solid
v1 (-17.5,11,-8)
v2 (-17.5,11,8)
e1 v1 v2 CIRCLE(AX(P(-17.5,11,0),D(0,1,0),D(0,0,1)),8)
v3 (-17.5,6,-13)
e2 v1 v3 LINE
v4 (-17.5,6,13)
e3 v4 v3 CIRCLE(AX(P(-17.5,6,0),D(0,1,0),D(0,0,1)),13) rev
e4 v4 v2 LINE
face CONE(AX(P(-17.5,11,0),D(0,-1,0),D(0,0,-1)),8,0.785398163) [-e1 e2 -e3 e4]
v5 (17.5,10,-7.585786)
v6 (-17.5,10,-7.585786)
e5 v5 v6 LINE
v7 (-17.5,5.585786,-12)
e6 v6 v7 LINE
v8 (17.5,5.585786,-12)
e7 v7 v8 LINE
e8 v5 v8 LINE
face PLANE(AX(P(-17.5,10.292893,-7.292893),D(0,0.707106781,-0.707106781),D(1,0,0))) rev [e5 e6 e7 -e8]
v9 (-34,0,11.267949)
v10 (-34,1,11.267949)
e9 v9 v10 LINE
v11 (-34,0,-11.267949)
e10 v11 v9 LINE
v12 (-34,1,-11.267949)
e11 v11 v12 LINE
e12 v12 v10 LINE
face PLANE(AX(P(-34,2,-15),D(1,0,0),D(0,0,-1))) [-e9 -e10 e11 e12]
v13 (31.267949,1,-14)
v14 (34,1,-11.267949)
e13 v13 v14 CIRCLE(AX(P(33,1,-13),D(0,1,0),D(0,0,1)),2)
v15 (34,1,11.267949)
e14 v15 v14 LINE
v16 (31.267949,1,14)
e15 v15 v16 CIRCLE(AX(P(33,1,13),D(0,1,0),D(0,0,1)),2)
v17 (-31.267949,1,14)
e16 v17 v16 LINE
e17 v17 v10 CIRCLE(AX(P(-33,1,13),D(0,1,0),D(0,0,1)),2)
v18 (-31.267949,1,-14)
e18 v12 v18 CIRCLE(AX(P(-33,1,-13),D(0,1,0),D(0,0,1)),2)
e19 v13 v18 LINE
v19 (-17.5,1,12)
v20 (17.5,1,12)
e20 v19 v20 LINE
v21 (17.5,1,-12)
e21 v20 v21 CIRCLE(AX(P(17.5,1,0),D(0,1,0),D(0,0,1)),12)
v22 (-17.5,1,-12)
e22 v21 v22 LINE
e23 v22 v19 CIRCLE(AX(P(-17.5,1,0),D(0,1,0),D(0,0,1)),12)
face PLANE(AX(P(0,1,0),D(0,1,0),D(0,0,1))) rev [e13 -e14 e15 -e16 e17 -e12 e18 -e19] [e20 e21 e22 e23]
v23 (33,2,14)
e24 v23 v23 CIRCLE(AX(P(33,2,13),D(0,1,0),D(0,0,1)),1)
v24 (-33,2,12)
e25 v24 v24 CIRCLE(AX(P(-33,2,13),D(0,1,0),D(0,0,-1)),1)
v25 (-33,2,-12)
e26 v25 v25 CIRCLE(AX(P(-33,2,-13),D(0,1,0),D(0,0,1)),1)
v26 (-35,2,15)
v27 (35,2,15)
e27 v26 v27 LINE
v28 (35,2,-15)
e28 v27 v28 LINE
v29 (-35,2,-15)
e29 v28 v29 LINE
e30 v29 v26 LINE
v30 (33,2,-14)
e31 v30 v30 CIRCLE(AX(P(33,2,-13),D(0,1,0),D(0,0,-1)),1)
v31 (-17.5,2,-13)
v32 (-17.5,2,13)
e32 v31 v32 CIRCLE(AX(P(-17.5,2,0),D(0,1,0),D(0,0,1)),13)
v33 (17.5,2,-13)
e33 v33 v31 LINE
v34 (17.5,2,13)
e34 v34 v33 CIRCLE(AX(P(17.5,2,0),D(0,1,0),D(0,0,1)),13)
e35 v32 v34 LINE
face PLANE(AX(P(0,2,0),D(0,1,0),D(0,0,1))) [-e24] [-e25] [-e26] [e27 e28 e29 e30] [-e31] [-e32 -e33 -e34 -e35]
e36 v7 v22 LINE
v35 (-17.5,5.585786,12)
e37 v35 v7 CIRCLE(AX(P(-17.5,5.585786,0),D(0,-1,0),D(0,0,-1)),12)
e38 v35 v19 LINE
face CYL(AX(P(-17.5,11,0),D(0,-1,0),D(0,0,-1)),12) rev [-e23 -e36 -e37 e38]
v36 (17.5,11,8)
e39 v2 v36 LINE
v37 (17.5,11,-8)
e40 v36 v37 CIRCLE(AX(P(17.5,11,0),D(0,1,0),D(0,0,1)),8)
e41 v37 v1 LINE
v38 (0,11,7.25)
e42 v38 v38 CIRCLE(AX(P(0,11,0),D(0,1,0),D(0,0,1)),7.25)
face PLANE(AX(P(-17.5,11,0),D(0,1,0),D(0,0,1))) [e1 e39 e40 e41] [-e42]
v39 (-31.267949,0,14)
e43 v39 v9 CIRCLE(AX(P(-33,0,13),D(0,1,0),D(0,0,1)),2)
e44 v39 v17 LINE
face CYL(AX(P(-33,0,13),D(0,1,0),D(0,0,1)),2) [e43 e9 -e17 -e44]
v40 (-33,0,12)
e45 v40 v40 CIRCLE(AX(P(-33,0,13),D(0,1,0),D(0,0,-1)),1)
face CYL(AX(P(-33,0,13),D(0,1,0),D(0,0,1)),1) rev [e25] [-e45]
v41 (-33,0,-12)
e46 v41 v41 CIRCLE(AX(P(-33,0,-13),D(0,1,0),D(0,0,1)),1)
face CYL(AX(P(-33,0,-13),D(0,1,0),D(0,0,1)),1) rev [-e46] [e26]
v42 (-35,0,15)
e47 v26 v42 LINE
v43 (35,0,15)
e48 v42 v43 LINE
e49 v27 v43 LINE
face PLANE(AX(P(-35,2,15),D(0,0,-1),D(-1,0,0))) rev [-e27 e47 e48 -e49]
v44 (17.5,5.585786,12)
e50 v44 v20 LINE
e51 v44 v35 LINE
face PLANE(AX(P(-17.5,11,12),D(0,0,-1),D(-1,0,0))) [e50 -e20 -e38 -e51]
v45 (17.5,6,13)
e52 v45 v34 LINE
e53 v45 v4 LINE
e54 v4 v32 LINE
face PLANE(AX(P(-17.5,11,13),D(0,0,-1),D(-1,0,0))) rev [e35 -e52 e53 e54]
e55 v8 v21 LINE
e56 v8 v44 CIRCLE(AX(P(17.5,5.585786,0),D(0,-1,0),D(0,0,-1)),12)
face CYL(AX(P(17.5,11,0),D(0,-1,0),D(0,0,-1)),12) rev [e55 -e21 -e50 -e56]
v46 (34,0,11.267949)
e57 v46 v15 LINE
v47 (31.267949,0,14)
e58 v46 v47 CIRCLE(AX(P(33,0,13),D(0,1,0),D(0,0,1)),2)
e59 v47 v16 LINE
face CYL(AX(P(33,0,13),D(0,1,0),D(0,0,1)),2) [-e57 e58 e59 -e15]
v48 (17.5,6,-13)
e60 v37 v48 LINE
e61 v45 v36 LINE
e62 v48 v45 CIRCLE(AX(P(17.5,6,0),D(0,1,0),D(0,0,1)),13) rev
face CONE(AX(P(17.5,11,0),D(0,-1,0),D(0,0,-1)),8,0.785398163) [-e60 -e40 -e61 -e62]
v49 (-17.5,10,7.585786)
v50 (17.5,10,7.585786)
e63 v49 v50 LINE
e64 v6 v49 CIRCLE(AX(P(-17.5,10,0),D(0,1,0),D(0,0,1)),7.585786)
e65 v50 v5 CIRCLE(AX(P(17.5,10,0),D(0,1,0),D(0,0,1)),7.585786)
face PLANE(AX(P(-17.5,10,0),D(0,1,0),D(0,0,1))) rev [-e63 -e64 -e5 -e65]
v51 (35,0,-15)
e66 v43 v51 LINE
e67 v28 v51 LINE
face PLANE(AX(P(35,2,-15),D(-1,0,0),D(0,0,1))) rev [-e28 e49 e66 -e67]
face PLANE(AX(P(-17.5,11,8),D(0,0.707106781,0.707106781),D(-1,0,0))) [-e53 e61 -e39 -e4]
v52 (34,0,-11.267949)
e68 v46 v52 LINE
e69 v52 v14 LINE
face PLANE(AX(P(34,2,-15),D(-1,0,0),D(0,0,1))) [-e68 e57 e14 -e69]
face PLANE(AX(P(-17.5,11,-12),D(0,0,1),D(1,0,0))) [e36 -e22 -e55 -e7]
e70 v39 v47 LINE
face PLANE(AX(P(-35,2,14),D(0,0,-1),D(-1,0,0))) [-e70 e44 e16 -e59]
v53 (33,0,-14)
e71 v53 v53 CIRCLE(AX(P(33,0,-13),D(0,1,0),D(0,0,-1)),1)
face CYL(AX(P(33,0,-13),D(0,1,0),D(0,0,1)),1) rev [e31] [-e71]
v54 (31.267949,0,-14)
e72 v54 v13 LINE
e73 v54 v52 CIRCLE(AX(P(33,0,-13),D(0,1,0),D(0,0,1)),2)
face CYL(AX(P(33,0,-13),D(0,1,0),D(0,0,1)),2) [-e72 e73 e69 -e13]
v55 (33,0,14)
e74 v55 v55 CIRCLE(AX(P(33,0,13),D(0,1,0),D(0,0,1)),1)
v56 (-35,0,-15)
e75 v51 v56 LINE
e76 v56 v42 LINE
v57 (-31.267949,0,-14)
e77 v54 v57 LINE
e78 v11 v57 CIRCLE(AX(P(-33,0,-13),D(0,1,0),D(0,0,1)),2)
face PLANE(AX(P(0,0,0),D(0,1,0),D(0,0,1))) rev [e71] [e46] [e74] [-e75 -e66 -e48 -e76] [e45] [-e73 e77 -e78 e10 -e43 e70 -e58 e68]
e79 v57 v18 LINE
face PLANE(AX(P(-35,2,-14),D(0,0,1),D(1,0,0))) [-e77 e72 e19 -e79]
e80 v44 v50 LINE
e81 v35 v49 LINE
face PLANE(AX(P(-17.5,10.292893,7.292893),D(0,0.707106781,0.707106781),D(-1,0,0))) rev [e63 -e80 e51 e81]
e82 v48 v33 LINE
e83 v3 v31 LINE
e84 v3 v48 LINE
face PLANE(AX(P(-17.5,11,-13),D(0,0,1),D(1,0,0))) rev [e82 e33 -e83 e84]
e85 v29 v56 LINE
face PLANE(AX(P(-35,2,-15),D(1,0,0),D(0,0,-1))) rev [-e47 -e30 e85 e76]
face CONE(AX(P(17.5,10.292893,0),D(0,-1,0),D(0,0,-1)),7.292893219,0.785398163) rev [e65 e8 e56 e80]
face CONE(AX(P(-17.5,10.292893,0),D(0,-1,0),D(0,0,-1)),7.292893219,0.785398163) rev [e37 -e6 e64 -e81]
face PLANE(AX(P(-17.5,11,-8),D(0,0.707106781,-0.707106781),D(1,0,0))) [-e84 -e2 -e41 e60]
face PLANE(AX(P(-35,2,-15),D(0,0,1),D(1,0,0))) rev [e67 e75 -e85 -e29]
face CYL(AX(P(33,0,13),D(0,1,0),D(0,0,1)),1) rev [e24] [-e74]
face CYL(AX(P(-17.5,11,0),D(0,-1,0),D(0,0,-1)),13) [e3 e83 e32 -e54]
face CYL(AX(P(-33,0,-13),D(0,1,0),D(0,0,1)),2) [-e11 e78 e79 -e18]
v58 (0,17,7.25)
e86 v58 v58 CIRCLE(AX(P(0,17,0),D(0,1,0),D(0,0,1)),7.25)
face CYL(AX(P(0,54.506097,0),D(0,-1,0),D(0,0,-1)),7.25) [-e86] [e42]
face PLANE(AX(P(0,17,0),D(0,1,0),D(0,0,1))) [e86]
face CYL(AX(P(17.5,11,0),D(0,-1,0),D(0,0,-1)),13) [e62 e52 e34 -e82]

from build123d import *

# Parameters (mm, degrees)
SKETCH_1_W          = 70
SKETCH_1_H          = 30
EXTRUDE_1_DEPTH     = 2
SKETCH_2_R          = 1
CUT_EXTRUDE_1_DEPTH = 39.13135193
EXTRUDE_2_DEPTH     = 9
CHAMFER_2_SIZE      = 5
SHELL_2_DEPTH       = 5.585786438
SHELL_2_2_DEPTH     = 1
SKETCH_4_R          = 7.25
EXTRUDE_3_DEPTH     = 6


with BuildPart() as part:
    # 草图1 → 凸台-拉伸1 (new body)
    with BuildSketch(Plane(origin=(0, 0, 0), x_dir=(1, 0, 0), z_dir=(0, 1, 0))):
        Rectangle(SKETCH_1_W, SKETCH_1_H)
    extrude(amount=EXTRUDE_1_DEPTH)

    # 草图2 → 切除-拉伸1 (cut, through all)
    with BuildSketch(Plane(origin=(0, 2, 0), x_dir=(1, 0, 0), z_dir=(0, 1, 0))):
        with Locations(Location((-33, 13, 0), (0, 0, 270))):
            Circle(SKETCH_2_R)
        with Locations(Location((33, 13, 0), (0, 0, 90))):
            Circle(SKETCH_2_R)
        with Locations(Location((33, -13, 0), (0, 0, 270))):
            Circle(SKETCH_2_R)
        with Locations(Location((-33, -13, 0), (0, 0, 90))):
            Circle(SKETCH_2_R)
    extrude(amount=-CUT_EXTRUDE_1_DEPTH, mode=Mode.SUBTRACT)

    # 草图3 → 凸台-拉伸2 (add)
    with BuildSketch(Plane(origin=(0, 2, 0), x_dir=(1, 0, 0), z_dir=(0, 1, 0))):
        with BuildLine():
            Line((-17.5, 13), (17.5, 13))
            ThreePointArc((17.5, 13), (30.5, 0), (17.5, -13))
            Line((17.5, -13), (-17.5, -13))
            ThreePointArc((-17.5, -13), (-30.5, 0), (-17.5, 13))
        make_face()
    extrude(amount=EXTRUDE_2_DEPTH)

    # 倒角2
    chamfer_2_edges = [part.edges().sort_by_distance(p)[0] for p in [
        (-30.5, 11, 0),
        (0, 11, 13),
        (30.5, 11, 0),
        (0, 11, -13),
    ]]
    chamfer(chamfer_2_edges, length=CHAMFER_2_SIZE)

    # 抽壳2: read off the stored shape, not the designer's step
    # 抽壳2 outline → 抽壳2 (cut)
    with BuildSketch(Plane(origin=(0, 0, 0), x_dir=(1, 0, 0), z_dir=(0, 1, 0))):
        with BuildLine():
            ThreePointArc((-17.5, 12), (-29.5, 0), (-17.5, -12))
            Line((-17.5, -12), (17.5, -12))
            ThreePointArc((17.5, -12), (29.5, 0), (17.5, 12))
            Line((17.5, 12), (-17.5, 12))
        make_face()
    extrude(amount=SHELL_2_DEPTH, mode=Mode.SUBTRACT)

    # Shell 2 2 outline → Shell 2 2 (cut)
    with BuildSketch(Plane(origin=(0, 0, 0), x_dir=(1, 0, 0), z_dir=(0, 1, 0))):
        with BuildLine():
            Line((-34, 11.267949192), (-34, -11.267949192))
            ThreePointArc((-34, -11.267949192), (-31.585786438, -11.585786438), (-31.267949192, -14))
            Line((-31.267949192, -14), (31.267949192, -14))
            ThreePointArc((31.267949192, -14), (31.585786438, -11.585786438), (34, -11.267949192))
            Line((34, -11.267949192), (34, 11.267949192))
            ThreePointArc((34, 11.267949192), (31.585786438, 11.585786438), (31.267949192, 14))
            Line((31.267949192, 14), (-31.267949192, 14))
            ThreePointArc((-31.267949192, 14), (-31.585786438, 11.585786438), (-34, 11.267949192))
        make_face()
        with BuildLine():
            Line((17.5, -12), (-17.5, -12))
            ThreePointArc((-17.5, -12), (-29.5, 0), (-17.5, 12))
            Line((-17.5, 12), (17.5, 12))
            ThreePointArc((17.5, 12), (29.5, 0), (17.5, -12))
        make_face(mode=Mode.SUBTRACT)
    extrude(amount=SHELL_2_2_DEPTH, mode=Mode.SUBTRACT)

    # Shell 2 3: loft between two sections, ruled curve by curve
    shell_2_3_from = [
        Edge.make_three_point_arc((17.5, 10, -7.585786438), (22.863961031, 10, -5.363961031), (25.085786438, 10, 0)),
        Edge.make_three_point_arc((25.085786438, 10, 0), (22.863961031, 10, 5.363961031), (17.5, 10, 7.585786438)),
        Edge.make_three_point_arc((-17.5, 10, 7.585786438), (-22.863961031, 10, 5.363961031), (-25.085786438, 10, 0)),
        Edge.make_three_point_arc((-25.085786438, 10, 0), (-22.863961031, 10, -5.363961031), (-17.5, 10, -7.585786438)),
        Edge.make_line((17.5, 10, -7.585786438), (-17.5, 10, -7.585786438)),
        Edge.make_line((17.5, 10, 7.585786438), (-17.5, 10, 7.585786438)),
    ]
    shell_2_3_to = [
        Edge.make_three_point_arc((17.5, 5.585786438, -12), (25.985281374, 5.585786438, -8.485281374), (29.5, 5.585786438, 0)),
        Edge.make_three_point_arc((29.5, 5.585786438, 0), (25.985281374, 5.585786438, 8.485281374), (17.5, 5.585786438, 12)),
        Edge.make_three_point_arc((-17.5, 5.585786438, 12), (-25.985281374, 5.585786438, 8.485281374), (-29.5, 5.585786438, 0)),
        Edge.make_three_point_arc((-29.5, 5.585786438, 0), (-25.985281374, 5.585786438, -8.485281374), (-17.5, 5.585786438, -12)),
        Edge.make_line((17.5, 5.585786438, -12), (-17.5, 5.585786438, -12)),
        Edge.make_line((17.5, 5.585786438, 12), (-17.5, 5.585786438, 12)),
    ]
    shell_2_3 = Solid(Shell([*[Face.make_surface_from_curves(shell_2_3_from[k], shell_2_3_to[k]) for k in range(6)], Face(Wire(shell_2_3_from)), Face(Wire(shell_2_3_to))]))
    add(shell_2_3, mode=Mode.SUBTRACT)

    # 草图4 → 凸台-拉伸3 (add)
    with BuildSketch(Plane(origin=(0, 11, 0), x_dir=(1, 0, 0), z_dir=(0, 1, 0))):
        with Locations(Location((0, 0, 0), (0, 0, 270))):
            Circle(SKETCH_4_R)
    extrude(amount=EXTRUDE_3_DEPTH)


solid = part.part
